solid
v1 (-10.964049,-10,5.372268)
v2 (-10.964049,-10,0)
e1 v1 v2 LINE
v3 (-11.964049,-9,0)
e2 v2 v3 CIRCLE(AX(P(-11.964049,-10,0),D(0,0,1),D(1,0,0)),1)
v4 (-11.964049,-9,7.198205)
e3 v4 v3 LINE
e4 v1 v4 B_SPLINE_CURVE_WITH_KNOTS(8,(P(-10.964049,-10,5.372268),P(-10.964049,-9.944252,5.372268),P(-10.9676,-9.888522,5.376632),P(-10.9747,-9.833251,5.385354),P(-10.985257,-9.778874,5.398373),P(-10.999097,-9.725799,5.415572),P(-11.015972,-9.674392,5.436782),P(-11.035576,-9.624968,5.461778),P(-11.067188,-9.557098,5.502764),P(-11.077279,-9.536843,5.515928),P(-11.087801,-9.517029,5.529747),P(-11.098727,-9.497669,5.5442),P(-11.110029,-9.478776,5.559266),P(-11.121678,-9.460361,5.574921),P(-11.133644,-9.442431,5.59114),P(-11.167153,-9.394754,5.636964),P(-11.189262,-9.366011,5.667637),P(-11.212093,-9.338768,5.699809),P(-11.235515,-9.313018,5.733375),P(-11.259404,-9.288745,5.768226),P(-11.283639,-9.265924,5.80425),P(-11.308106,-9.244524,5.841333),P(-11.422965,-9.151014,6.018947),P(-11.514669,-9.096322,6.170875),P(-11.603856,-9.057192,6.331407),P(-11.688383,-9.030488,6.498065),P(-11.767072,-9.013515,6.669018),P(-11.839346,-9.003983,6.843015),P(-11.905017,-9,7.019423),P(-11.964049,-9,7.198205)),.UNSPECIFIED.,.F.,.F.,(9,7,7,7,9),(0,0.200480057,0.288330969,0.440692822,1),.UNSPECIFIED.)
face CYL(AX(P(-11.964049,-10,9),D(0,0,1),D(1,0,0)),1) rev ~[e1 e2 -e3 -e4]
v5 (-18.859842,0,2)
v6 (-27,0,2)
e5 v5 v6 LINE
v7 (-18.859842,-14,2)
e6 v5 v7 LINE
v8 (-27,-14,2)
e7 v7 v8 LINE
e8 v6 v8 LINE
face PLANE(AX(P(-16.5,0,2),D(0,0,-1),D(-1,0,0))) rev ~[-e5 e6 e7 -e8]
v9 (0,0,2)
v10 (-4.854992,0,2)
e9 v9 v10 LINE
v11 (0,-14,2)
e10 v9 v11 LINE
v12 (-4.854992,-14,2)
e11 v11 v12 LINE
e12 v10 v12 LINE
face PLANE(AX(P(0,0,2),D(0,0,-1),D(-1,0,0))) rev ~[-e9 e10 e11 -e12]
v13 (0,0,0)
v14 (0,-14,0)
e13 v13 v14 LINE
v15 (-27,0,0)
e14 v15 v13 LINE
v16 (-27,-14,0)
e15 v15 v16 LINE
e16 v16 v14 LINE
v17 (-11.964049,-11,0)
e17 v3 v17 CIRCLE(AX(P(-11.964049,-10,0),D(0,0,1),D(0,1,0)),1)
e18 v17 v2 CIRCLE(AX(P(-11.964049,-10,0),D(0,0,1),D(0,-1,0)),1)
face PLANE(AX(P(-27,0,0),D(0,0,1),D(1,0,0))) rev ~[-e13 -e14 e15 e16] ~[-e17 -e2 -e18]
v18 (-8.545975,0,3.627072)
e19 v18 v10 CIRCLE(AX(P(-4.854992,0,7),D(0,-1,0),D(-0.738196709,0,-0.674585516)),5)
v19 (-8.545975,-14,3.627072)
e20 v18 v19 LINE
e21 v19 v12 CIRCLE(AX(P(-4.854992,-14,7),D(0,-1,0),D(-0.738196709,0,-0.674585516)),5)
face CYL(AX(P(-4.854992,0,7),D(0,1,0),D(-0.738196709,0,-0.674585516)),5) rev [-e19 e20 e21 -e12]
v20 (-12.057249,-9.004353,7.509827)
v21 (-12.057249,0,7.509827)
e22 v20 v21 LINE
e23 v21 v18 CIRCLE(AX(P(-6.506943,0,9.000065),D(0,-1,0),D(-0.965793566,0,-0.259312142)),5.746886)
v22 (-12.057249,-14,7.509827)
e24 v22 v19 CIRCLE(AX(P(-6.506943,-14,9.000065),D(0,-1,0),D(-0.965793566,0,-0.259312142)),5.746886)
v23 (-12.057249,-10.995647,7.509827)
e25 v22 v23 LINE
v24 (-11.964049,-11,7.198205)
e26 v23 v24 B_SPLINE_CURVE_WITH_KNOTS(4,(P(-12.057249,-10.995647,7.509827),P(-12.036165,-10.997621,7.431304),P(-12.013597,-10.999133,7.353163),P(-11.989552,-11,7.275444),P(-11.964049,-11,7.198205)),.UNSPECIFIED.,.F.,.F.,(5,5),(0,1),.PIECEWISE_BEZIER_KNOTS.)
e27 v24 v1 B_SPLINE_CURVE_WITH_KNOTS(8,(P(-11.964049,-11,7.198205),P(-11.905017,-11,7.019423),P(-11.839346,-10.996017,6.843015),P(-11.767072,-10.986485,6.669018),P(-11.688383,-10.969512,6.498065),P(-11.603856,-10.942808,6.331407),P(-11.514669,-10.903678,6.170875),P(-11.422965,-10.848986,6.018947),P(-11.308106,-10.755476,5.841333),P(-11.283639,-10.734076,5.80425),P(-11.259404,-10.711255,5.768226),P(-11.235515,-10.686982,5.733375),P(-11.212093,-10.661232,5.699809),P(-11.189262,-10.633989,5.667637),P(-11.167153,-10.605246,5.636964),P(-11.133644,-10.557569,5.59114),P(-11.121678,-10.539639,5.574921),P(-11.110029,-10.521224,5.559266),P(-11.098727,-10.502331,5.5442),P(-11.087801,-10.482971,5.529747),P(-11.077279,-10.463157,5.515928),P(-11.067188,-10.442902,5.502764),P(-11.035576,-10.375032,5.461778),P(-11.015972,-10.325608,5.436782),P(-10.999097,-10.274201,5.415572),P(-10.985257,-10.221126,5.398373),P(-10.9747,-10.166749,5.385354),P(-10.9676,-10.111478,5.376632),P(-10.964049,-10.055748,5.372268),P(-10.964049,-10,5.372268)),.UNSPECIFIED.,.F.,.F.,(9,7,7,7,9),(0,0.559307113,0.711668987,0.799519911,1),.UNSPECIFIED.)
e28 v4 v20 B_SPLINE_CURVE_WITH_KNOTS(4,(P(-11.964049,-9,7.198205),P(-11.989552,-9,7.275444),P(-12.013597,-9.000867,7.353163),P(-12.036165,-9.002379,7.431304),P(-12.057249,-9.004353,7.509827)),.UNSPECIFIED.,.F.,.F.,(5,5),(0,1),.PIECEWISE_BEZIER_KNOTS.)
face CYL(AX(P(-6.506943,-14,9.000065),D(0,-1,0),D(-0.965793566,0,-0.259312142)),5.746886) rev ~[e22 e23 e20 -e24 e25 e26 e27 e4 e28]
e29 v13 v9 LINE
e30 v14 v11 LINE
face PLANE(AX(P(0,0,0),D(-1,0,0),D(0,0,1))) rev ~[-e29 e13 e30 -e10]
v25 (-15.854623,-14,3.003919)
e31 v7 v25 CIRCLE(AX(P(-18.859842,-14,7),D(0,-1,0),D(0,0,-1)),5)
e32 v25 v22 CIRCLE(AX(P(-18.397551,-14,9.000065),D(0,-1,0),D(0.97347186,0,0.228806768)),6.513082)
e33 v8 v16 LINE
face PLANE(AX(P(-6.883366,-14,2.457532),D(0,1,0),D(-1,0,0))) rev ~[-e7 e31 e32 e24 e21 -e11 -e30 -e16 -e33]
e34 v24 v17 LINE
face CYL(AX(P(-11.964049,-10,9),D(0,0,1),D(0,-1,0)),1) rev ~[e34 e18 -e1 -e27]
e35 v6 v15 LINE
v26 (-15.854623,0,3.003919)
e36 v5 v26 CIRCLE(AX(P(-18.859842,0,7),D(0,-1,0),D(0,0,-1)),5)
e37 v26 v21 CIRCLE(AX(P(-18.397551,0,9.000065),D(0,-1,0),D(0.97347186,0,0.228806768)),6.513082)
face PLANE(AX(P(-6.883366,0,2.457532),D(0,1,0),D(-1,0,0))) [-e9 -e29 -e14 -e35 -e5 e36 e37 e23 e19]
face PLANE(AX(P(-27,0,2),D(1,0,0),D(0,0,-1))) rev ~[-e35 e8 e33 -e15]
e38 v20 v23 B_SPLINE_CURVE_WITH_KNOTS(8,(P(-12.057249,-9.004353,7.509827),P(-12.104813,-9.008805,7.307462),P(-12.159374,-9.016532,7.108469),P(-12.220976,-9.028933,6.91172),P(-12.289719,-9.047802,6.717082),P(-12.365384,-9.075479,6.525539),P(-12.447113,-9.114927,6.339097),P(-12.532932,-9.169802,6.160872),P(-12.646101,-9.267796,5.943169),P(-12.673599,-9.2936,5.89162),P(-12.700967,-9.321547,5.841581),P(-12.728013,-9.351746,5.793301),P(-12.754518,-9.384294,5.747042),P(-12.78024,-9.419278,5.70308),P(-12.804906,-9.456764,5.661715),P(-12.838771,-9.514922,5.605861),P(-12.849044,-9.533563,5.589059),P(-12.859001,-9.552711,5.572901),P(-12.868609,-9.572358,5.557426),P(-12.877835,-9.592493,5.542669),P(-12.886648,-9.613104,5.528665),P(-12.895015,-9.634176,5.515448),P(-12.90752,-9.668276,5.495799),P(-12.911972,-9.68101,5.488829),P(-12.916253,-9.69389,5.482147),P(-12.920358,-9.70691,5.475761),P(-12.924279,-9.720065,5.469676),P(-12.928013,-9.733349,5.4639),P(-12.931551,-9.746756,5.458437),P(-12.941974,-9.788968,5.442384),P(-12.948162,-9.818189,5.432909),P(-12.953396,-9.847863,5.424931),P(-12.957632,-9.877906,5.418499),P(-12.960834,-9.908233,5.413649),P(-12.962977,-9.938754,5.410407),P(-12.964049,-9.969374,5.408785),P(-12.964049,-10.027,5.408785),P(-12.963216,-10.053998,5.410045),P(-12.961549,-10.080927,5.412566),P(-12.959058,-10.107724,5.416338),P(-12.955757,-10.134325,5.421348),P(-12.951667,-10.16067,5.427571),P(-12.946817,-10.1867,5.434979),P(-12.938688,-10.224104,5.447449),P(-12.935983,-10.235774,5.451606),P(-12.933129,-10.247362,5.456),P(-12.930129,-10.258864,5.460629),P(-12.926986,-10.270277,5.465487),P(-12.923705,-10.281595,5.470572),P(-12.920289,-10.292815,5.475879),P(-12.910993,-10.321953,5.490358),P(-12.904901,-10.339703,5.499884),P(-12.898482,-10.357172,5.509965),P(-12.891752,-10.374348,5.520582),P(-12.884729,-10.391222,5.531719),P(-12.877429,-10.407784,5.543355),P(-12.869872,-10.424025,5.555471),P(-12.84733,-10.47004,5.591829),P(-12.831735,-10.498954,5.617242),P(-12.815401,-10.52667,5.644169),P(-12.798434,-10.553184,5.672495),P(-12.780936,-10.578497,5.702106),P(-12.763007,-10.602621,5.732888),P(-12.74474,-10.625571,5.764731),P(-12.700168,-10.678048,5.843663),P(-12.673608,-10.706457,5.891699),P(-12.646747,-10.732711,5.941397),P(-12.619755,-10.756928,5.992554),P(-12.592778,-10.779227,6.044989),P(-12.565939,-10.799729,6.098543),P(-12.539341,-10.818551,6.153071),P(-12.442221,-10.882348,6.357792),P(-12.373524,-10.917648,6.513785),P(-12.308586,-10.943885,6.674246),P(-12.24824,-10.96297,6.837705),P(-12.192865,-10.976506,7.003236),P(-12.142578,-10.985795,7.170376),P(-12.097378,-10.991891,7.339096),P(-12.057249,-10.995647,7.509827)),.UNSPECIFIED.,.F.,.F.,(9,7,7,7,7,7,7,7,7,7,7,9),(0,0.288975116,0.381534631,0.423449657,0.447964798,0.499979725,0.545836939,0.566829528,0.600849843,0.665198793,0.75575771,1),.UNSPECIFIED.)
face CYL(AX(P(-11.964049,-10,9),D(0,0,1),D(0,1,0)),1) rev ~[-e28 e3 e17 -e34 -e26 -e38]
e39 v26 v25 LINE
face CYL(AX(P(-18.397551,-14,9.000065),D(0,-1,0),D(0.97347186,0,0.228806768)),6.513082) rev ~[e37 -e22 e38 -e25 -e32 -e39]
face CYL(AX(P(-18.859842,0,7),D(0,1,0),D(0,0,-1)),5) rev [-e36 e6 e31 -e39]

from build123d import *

# Parameters (mm, degrees)
F1_DEPTH    = 14
F4_DEPTH    = 25
F7_DEPTH    = 25
F8_T1_DEPTH = 14
F9_T1_DEPTH = 14


# Not quite as in the source:
# - a fillet or chamfer that OpenCascade refuses, or shapes differently, is made with other operations: its cross-section is extruded or revolved along the edge and cut away or added


with BuildPart() as f1:
    # F0 (on Front) → F1 (new body)
    with BuildSketch(Plane.XZ):
        Polygon((-16.5, 2), (-27, 2), (-27, 0), (0, 0), (0, 2), (-7.5, 2), (-12, 2), align=None)
        Polygon((-12, 9), (-16.5, 2), (-12, 2), align=None)
        Polygon((-12, 9), (-12, 2), (-7.5, 2), align=None)
    extrude(amount=F1_DEPTH)

    # F3 (on face) → F4 (cut)
    with BuildSketch(Plane.XY.offset(9)):
        with BuildLine():
            ThreePointArc((-10.9640486734, -10), (-11.2569418922, -9.2928932188), (-11.9640486734, -9))
            Line((-11.9640486734, -9), (-11.9640486734, -10))
            Line((-11.9640486734, -10), (-11.9640486734, -11))
            ThreePointArc((-11.9640486734, -11), (-11.2569418922, -10.7071067812), (-10.9640486734, -10))
        make_face()
        with BuildLine():
            Line((-11.9640486734, -10), (-11.9640486734, -9))
            ThreePointArc((-11.9640486734, -9), (-12.9640486734, -10), (-11.9640486734, -11))
            Line((-11.9640486734, -11), (-11.9640486734, -10))
        make_face()
    extrude(amount=-F4_DEPTH, mode=Mode.SUBTRACT)

    # F6 (on offset) → F7 (cut)
    with BuildSketch(Plane.XZ.offset(14)):
        with BuildLine():
            Line((-11.884468704, 9.0000648052), (-12.0001798496, 9.0000648052))
            Line((-12.0001798496, 9.0000648052), (-12.253829136, 9.0000648052))
            ThreePointArc((-12.253829136, 9.0000648052), (-12.2044720661, 8.2484912646), (-12.0572486618, 7.5098274869))
            ThreePointArc((-12.0572486618, 7.5098274869), (-11.9278078867, 8.2499547835), (-11.884468704, 9.0000648052))
        make_face()
        with BuildLine():
            Line((-12.253829136, 9.0000648052), (-12.0001798496, 9.0000648052))
            Line((-12.0001798496, 9.0000648052), (-11.884468704, 9.0000648052))
            ThreePointArc((-11.884468704, 9.0000648052), (-11.9278078867, 9.7501748268), (-12.0572486618, 10.4903021234))
            ThreePointArc((-12.0572486618, 10.4903021234), (-12.2044720661, 9.7516383457), (-12.253829136, 9.0000648052))
        make_face()
        with BuildLine():
            ThreePointArc((-12.0572486618, 7.5098274869), (-12.2044720661, 8.2484912646), (-12.253829136, 9.0000648052))
            ThreePointArc((-12.253829136, 9.0000648052), (-12.2044720661, 9.7516383457), (-12.0572486618, 10.4903021234))
            ThreePointArc((-12.0572486618, 10.4903021234), (-24.9106333558, 9.0000648052), (-12.0572486618, 7.5098274869))
        make_face()
        with BuildLine():
            ThreePointArc((-12.0572486618, 10.4903021234), (-11.9278078867, 9.7501748268), (-11.884468704, 9.0000648052))
            ThreePointArc((-11.884468704, 9.0000648052), (-11.9278078867, 8.2499547835), (-12.0572486618, 7.5098274869))
            ThreePointArc((-12.0572486618, 7.5098274869), (-5.7553696033, 3.3025358829), (-0.7600571518, 9.0000648052))
            ThreePointArc((-0.7600571518, 9.0000648052), (-5.7553696033, 14.6975937274), (-12.0572486618, 10.4903021234))
        make_face()
    extrude(amount=-F7_DEPTH, mode=Mode.SUBTRACT)

    # F8: fillet of radius 5 on 1 edges, made by hand

    # F8_s2 → F8_t1 (join)
    with BuildSketch(Plane.XZ):
        with BuildLine():
            ThreePointArc((-18.8598420152, 2), (-17.2756076516, 2.2576164768), (-15.854623238, 3.0039194075))
            Line((-15.854623238, 3.0039194075), (-16.5, 2))
            Line((-16.5, 2), (-18.8598420152, 2))
        make_face()
    extrude(amount=F8_T1_DEPTH)

    # F9: fillet of radius 5 on 1 edges, made by hand

    # F9_s2 → F9_t1 (join)
    with BuildSketch(Plane.XZ):
        with BuildLine():
            ThreePointArc((-8.5459751266, 3.6270724192), (-6.8718408683, 2.4248148724), (-4.8549915809, 2))
            Line((-4.8549915809, 2), (-7.5, 2))
            Line((-7.5, 2), (-8.5459751266, 3.6270724192))
        make_face()
    extrude(amount=F9_T1_DEPTH)


solid = f1.part
